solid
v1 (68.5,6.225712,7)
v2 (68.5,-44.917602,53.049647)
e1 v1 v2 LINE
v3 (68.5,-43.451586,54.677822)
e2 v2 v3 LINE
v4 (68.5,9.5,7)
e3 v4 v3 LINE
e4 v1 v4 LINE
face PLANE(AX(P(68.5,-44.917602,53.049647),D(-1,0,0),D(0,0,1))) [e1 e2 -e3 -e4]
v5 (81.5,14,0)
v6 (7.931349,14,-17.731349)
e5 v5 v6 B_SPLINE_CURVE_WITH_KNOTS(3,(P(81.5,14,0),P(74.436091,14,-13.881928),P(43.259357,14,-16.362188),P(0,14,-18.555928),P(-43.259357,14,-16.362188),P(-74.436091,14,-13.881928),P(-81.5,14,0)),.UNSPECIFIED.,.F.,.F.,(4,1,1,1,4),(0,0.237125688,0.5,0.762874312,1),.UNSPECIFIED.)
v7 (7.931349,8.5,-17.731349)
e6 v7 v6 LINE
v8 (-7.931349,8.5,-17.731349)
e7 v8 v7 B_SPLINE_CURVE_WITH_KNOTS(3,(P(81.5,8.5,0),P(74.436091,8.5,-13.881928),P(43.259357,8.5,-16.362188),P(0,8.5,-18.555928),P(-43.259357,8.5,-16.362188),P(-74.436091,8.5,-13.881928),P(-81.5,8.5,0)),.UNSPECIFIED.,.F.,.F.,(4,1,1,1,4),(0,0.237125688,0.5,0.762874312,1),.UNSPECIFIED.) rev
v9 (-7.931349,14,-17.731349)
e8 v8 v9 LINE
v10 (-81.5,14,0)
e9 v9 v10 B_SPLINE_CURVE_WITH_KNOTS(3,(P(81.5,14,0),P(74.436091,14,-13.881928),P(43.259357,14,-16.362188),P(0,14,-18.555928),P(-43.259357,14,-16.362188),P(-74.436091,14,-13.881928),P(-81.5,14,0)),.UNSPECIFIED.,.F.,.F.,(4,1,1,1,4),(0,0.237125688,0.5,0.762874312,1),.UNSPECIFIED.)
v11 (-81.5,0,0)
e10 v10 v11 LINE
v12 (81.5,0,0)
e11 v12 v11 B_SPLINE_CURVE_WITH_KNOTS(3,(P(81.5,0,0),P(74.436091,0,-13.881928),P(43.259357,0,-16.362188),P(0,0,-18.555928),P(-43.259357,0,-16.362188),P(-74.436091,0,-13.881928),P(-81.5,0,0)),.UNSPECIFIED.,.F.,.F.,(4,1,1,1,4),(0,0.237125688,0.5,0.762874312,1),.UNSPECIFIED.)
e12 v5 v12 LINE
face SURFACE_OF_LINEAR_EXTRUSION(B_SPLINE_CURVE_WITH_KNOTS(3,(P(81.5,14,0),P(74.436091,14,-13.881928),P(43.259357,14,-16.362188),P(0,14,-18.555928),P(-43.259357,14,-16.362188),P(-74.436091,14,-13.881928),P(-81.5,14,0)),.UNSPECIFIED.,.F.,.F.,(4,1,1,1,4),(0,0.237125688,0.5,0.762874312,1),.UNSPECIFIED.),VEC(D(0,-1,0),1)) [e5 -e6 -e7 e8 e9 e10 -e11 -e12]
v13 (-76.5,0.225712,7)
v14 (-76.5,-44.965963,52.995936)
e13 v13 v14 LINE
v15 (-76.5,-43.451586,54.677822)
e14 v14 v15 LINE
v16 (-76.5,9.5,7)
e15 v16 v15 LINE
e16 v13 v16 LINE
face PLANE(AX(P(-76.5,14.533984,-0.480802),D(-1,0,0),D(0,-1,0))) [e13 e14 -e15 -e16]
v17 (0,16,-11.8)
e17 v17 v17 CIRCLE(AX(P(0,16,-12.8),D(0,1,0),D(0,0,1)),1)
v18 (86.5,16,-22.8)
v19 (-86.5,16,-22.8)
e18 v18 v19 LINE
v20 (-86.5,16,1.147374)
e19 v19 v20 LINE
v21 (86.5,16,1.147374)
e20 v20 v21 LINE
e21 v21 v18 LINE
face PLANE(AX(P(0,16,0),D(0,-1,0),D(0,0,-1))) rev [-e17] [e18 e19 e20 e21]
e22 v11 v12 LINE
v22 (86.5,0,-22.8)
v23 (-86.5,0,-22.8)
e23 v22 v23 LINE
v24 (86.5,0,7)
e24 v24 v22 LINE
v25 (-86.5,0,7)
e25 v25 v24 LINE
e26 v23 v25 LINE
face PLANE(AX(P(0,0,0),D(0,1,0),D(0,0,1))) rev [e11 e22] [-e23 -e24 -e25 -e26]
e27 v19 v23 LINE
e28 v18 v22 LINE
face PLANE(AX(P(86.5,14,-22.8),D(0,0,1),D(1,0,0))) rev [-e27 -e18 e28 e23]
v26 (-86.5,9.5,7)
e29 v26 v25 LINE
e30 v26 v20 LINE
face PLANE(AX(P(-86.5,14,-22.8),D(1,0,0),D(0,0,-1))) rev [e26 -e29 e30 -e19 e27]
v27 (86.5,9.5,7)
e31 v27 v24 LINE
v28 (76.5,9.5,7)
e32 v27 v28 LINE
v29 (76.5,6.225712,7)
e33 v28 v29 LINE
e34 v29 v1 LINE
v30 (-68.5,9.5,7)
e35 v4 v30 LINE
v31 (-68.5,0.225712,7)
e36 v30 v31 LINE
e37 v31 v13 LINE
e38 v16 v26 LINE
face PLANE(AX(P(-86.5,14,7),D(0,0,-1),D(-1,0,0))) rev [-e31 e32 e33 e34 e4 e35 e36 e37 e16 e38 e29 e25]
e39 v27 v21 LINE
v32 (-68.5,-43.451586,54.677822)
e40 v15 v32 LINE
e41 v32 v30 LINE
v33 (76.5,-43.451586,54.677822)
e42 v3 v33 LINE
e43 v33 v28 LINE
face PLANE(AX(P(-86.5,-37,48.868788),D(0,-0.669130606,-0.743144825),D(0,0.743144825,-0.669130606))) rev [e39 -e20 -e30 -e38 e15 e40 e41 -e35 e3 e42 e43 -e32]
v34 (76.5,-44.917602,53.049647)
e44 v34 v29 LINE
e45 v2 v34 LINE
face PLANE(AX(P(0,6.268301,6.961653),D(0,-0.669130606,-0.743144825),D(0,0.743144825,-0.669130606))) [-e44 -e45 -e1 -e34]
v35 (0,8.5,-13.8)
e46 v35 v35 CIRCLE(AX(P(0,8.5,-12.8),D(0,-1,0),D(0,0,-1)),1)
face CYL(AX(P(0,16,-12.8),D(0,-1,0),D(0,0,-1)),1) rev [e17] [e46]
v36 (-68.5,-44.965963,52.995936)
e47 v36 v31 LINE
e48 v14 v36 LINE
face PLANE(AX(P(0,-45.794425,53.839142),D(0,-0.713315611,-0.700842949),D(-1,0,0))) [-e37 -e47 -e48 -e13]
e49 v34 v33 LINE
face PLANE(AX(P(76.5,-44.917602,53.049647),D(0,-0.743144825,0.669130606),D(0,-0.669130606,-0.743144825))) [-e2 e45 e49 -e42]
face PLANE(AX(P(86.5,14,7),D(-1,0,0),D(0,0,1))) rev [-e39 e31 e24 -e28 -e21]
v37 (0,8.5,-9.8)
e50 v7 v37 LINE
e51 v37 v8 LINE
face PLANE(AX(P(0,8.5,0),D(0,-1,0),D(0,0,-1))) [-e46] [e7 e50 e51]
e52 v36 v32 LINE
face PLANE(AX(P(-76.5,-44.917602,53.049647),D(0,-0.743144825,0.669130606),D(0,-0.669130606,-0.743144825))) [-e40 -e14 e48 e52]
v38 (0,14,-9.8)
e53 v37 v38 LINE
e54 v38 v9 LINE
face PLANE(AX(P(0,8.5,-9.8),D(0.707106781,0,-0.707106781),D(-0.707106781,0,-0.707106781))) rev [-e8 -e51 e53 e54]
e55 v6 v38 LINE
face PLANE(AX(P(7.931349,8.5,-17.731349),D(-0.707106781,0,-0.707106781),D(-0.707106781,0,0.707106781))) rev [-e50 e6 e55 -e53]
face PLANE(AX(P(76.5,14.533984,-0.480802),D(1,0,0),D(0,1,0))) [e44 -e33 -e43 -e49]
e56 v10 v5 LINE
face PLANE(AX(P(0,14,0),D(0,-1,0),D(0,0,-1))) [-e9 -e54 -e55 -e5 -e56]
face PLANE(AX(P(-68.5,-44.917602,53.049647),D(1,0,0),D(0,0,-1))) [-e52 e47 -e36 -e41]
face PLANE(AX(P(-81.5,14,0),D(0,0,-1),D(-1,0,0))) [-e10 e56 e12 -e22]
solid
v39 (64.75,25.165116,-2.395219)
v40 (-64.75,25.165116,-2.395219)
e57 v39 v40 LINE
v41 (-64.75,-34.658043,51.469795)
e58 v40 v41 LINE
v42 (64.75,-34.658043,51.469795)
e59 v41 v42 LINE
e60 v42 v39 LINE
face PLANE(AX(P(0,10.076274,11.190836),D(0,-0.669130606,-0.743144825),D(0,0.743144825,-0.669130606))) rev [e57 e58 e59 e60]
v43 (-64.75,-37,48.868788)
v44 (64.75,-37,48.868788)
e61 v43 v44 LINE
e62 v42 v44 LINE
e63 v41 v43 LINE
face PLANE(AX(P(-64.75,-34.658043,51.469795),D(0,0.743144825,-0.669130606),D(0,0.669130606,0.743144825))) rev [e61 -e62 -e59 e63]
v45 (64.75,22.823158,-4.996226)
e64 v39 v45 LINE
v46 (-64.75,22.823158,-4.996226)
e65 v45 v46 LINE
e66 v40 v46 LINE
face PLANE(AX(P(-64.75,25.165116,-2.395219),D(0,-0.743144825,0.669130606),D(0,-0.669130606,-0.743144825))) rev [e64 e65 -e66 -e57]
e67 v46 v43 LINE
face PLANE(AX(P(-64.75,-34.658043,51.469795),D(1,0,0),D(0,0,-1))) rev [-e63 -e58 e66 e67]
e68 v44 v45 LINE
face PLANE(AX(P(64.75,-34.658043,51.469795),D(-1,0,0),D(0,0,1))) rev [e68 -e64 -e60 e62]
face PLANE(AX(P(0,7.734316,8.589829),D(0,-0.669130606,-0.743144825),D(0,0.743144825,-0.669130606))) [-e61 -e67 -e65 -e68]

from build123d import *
from build123d.topology import SkipClean

# Parameters (mm, degrees)
SKETCH2_W               = 173
SKETCH2_H               = 29.8
BOSS_EXTRUDE1_DEPTH     = 14
SKETCH4_W               = 173
SKETCH4_H               = 29.8
SKETCH4_R               = 1
BOSS_EXTRUDE3_DEPTH     = 2
BOSS_EXTRUDE4_START     = 5.5
SKETCH5_R               = 1
BOSS_EXTRUDE4_DEPTH     = 5.5
CUT_EXTRUDE1_DEPTH      = 91.874033815
CUT_EXTRUDE1_DEPTH_BACK = 91.874033815
SKETCH7_W               = 129.5
SKETCH7_H               = 80.5
BOSS_EXTRUDE5_DEPTH     = 3.5
SKETCH8_W               = 8
SKETCH8_H               = 80
BOSS_EXTRUDE6_DEPTH     = 2.190926
CHAMFER1_START          = -76.5
CHAMFER1_DEPTH          = 8


with BuildPart() as part:
    # Sketch2 → Boss-Extrude1 (new body)
    with BuildSketch(Plane(origin=(0, 0, 0), x_dir=(1, 0, 0), z_dir=(0, 1, 0))):
        with Locations((0, 7.9)):
            Rectangle(SKETCH2_W, SKETCH2_H)
        with BuildLine():
            Line((-81.5, 0), (81.5, 0))
            add(Edge.make_bspline(
                [(-81.5, 0), (-74.436091259, 13.881927863), (-43.259356961, 16.362188276), (0, 18.555927536), (43.259356961, 16.362188276), (74.436091259, 13.881927863), (81.5, 0)],
                knots=[0, 0, 0, 0, 0.237125688, 0.5, 0.762874312, 1, 1, 1, 1], degree=3))
        make_face(mode=Mode.SUBTRACT)
    extrude(amount=BOSS_EXTRUDE1_DEPTH)

    # Sketch4 → Boss-Extrude3 (add)
    with BuildSketch(Plane(origin=(0, 14, 0), x_dir=(1, 0, 0), z_dir=(0, 1, 0))):
        with Locations((0, 7.9)):
            Rectangle(SKETCH4_W, SKETCH4_H)
        with Locations(Location((0, 12.8, 0), (0, 0, 270))):
            Circle(SKETCH4_R, mode=Mode.SUBTRACT)
    extrude(amount=BOSS_EXTRUDE3_DEPTH)

    # Sketch5 → Boss-Extrude4 (add)
    with SkipClean():  # the faces are left unmerged after this step: merging them gives an invalid solid
        with BuildSketch(Plane.XZ.offset(-14).offset(BOSS_EXTRUDE4_START)):
            Polygon((0, -9.8), (-7.931348641, -17.731348641), (-7.931348641, -22.8), (7.931348641, -22.8), (7.931348641, -17.731348641), align=None)
            with Locations(Location((0, -12.8, 0), (0, 0, 270))):
                Circle(SKETCH5_R, mode=Mode.SUBTRACT)
        extrude(amount=-BOSS_EXTRUDE4_DEPTH)

    # Sketch3 → Cut-Extrude1 (cut, two sides: drawn at the far end of the back side and taken through both)
    with SkipClean():  # the faces are left unmerged after this step: merging them gives an invalid solid
        with BuildSketch(Plane(origin=(0, 0, 0), x_dir=(0, 0, -1), z_dir=(1, 0, 0)).offset(-CUT_EXTRUDE1_DEPTH_BACK)):
            Polygon((-48.86878806, -37), (4.996225752, 22.823158451), (1.280501625, 26.168811483), (-52.584512187, -33.654346968), align=None)
        extrude(amount=CUT_EXTRUDE1_DEPTH + CUT_EXTRUDE1_DEPTH_BACK, mode=Mode.SUBTRACT)

    # Sketch8 → Boss-Extrude6 (add)
    with SkipClean():  # the faces are left unmerged after this step: merging them gives an invalid solid
        with BuildSketch(Plane(origin=(0, 7.734316433, 8.589828624), x_dir=(1, 0, 0), z_dir=(0, 0.669130606358862, 0.7431448254773908))):
            with Locations((-72.5, -28.87742566)):
                Rectangle(SKETCH8_W, SKETCH8_H)
            with Locations((72.5, -28.87742566)):
                Rectangle(SKETCH8_W, SKETCH8_H)
        extrude(amount=-BOSS_EXTRUDE6_DEPTH)

    # Chamfer1: read off the stored shape, not the designer's step
    # Chamfer1 outline → Chamfer1 (add)
    with SkipClean():  # the faces are left unmerged after this step: merging them gives an invalid solid
        with BuildSketch(Plane.YZ.offset(CHAMFER1_START)):
            Polygon((-44.917601714, 53.049646864), (-44.965963009, 52.995936205), (0.225712396, 7), (6.225712396, 7), align=None)
        extrude(amount=CHAMFER1_DEPTH)


with BuildPart() as body_2:
    # Sketch7 → Boss-Extrude5 (new body)
    with BuildSketch(Plane(origin=(0, 7.734316433, 8.589828624), x_dir=(1, 0, 0), z_dir=(0, 0.6691306063588622, 0.7431448254773908))):
        with Locations((0, -19.945960329)):
            Rectangle(SKETCH7_W, SKETCH7_H)
    extrude(amount=BOSS_EXTRUDE5_DEPTH)


solid = Compound([part.part, body_2.part])
